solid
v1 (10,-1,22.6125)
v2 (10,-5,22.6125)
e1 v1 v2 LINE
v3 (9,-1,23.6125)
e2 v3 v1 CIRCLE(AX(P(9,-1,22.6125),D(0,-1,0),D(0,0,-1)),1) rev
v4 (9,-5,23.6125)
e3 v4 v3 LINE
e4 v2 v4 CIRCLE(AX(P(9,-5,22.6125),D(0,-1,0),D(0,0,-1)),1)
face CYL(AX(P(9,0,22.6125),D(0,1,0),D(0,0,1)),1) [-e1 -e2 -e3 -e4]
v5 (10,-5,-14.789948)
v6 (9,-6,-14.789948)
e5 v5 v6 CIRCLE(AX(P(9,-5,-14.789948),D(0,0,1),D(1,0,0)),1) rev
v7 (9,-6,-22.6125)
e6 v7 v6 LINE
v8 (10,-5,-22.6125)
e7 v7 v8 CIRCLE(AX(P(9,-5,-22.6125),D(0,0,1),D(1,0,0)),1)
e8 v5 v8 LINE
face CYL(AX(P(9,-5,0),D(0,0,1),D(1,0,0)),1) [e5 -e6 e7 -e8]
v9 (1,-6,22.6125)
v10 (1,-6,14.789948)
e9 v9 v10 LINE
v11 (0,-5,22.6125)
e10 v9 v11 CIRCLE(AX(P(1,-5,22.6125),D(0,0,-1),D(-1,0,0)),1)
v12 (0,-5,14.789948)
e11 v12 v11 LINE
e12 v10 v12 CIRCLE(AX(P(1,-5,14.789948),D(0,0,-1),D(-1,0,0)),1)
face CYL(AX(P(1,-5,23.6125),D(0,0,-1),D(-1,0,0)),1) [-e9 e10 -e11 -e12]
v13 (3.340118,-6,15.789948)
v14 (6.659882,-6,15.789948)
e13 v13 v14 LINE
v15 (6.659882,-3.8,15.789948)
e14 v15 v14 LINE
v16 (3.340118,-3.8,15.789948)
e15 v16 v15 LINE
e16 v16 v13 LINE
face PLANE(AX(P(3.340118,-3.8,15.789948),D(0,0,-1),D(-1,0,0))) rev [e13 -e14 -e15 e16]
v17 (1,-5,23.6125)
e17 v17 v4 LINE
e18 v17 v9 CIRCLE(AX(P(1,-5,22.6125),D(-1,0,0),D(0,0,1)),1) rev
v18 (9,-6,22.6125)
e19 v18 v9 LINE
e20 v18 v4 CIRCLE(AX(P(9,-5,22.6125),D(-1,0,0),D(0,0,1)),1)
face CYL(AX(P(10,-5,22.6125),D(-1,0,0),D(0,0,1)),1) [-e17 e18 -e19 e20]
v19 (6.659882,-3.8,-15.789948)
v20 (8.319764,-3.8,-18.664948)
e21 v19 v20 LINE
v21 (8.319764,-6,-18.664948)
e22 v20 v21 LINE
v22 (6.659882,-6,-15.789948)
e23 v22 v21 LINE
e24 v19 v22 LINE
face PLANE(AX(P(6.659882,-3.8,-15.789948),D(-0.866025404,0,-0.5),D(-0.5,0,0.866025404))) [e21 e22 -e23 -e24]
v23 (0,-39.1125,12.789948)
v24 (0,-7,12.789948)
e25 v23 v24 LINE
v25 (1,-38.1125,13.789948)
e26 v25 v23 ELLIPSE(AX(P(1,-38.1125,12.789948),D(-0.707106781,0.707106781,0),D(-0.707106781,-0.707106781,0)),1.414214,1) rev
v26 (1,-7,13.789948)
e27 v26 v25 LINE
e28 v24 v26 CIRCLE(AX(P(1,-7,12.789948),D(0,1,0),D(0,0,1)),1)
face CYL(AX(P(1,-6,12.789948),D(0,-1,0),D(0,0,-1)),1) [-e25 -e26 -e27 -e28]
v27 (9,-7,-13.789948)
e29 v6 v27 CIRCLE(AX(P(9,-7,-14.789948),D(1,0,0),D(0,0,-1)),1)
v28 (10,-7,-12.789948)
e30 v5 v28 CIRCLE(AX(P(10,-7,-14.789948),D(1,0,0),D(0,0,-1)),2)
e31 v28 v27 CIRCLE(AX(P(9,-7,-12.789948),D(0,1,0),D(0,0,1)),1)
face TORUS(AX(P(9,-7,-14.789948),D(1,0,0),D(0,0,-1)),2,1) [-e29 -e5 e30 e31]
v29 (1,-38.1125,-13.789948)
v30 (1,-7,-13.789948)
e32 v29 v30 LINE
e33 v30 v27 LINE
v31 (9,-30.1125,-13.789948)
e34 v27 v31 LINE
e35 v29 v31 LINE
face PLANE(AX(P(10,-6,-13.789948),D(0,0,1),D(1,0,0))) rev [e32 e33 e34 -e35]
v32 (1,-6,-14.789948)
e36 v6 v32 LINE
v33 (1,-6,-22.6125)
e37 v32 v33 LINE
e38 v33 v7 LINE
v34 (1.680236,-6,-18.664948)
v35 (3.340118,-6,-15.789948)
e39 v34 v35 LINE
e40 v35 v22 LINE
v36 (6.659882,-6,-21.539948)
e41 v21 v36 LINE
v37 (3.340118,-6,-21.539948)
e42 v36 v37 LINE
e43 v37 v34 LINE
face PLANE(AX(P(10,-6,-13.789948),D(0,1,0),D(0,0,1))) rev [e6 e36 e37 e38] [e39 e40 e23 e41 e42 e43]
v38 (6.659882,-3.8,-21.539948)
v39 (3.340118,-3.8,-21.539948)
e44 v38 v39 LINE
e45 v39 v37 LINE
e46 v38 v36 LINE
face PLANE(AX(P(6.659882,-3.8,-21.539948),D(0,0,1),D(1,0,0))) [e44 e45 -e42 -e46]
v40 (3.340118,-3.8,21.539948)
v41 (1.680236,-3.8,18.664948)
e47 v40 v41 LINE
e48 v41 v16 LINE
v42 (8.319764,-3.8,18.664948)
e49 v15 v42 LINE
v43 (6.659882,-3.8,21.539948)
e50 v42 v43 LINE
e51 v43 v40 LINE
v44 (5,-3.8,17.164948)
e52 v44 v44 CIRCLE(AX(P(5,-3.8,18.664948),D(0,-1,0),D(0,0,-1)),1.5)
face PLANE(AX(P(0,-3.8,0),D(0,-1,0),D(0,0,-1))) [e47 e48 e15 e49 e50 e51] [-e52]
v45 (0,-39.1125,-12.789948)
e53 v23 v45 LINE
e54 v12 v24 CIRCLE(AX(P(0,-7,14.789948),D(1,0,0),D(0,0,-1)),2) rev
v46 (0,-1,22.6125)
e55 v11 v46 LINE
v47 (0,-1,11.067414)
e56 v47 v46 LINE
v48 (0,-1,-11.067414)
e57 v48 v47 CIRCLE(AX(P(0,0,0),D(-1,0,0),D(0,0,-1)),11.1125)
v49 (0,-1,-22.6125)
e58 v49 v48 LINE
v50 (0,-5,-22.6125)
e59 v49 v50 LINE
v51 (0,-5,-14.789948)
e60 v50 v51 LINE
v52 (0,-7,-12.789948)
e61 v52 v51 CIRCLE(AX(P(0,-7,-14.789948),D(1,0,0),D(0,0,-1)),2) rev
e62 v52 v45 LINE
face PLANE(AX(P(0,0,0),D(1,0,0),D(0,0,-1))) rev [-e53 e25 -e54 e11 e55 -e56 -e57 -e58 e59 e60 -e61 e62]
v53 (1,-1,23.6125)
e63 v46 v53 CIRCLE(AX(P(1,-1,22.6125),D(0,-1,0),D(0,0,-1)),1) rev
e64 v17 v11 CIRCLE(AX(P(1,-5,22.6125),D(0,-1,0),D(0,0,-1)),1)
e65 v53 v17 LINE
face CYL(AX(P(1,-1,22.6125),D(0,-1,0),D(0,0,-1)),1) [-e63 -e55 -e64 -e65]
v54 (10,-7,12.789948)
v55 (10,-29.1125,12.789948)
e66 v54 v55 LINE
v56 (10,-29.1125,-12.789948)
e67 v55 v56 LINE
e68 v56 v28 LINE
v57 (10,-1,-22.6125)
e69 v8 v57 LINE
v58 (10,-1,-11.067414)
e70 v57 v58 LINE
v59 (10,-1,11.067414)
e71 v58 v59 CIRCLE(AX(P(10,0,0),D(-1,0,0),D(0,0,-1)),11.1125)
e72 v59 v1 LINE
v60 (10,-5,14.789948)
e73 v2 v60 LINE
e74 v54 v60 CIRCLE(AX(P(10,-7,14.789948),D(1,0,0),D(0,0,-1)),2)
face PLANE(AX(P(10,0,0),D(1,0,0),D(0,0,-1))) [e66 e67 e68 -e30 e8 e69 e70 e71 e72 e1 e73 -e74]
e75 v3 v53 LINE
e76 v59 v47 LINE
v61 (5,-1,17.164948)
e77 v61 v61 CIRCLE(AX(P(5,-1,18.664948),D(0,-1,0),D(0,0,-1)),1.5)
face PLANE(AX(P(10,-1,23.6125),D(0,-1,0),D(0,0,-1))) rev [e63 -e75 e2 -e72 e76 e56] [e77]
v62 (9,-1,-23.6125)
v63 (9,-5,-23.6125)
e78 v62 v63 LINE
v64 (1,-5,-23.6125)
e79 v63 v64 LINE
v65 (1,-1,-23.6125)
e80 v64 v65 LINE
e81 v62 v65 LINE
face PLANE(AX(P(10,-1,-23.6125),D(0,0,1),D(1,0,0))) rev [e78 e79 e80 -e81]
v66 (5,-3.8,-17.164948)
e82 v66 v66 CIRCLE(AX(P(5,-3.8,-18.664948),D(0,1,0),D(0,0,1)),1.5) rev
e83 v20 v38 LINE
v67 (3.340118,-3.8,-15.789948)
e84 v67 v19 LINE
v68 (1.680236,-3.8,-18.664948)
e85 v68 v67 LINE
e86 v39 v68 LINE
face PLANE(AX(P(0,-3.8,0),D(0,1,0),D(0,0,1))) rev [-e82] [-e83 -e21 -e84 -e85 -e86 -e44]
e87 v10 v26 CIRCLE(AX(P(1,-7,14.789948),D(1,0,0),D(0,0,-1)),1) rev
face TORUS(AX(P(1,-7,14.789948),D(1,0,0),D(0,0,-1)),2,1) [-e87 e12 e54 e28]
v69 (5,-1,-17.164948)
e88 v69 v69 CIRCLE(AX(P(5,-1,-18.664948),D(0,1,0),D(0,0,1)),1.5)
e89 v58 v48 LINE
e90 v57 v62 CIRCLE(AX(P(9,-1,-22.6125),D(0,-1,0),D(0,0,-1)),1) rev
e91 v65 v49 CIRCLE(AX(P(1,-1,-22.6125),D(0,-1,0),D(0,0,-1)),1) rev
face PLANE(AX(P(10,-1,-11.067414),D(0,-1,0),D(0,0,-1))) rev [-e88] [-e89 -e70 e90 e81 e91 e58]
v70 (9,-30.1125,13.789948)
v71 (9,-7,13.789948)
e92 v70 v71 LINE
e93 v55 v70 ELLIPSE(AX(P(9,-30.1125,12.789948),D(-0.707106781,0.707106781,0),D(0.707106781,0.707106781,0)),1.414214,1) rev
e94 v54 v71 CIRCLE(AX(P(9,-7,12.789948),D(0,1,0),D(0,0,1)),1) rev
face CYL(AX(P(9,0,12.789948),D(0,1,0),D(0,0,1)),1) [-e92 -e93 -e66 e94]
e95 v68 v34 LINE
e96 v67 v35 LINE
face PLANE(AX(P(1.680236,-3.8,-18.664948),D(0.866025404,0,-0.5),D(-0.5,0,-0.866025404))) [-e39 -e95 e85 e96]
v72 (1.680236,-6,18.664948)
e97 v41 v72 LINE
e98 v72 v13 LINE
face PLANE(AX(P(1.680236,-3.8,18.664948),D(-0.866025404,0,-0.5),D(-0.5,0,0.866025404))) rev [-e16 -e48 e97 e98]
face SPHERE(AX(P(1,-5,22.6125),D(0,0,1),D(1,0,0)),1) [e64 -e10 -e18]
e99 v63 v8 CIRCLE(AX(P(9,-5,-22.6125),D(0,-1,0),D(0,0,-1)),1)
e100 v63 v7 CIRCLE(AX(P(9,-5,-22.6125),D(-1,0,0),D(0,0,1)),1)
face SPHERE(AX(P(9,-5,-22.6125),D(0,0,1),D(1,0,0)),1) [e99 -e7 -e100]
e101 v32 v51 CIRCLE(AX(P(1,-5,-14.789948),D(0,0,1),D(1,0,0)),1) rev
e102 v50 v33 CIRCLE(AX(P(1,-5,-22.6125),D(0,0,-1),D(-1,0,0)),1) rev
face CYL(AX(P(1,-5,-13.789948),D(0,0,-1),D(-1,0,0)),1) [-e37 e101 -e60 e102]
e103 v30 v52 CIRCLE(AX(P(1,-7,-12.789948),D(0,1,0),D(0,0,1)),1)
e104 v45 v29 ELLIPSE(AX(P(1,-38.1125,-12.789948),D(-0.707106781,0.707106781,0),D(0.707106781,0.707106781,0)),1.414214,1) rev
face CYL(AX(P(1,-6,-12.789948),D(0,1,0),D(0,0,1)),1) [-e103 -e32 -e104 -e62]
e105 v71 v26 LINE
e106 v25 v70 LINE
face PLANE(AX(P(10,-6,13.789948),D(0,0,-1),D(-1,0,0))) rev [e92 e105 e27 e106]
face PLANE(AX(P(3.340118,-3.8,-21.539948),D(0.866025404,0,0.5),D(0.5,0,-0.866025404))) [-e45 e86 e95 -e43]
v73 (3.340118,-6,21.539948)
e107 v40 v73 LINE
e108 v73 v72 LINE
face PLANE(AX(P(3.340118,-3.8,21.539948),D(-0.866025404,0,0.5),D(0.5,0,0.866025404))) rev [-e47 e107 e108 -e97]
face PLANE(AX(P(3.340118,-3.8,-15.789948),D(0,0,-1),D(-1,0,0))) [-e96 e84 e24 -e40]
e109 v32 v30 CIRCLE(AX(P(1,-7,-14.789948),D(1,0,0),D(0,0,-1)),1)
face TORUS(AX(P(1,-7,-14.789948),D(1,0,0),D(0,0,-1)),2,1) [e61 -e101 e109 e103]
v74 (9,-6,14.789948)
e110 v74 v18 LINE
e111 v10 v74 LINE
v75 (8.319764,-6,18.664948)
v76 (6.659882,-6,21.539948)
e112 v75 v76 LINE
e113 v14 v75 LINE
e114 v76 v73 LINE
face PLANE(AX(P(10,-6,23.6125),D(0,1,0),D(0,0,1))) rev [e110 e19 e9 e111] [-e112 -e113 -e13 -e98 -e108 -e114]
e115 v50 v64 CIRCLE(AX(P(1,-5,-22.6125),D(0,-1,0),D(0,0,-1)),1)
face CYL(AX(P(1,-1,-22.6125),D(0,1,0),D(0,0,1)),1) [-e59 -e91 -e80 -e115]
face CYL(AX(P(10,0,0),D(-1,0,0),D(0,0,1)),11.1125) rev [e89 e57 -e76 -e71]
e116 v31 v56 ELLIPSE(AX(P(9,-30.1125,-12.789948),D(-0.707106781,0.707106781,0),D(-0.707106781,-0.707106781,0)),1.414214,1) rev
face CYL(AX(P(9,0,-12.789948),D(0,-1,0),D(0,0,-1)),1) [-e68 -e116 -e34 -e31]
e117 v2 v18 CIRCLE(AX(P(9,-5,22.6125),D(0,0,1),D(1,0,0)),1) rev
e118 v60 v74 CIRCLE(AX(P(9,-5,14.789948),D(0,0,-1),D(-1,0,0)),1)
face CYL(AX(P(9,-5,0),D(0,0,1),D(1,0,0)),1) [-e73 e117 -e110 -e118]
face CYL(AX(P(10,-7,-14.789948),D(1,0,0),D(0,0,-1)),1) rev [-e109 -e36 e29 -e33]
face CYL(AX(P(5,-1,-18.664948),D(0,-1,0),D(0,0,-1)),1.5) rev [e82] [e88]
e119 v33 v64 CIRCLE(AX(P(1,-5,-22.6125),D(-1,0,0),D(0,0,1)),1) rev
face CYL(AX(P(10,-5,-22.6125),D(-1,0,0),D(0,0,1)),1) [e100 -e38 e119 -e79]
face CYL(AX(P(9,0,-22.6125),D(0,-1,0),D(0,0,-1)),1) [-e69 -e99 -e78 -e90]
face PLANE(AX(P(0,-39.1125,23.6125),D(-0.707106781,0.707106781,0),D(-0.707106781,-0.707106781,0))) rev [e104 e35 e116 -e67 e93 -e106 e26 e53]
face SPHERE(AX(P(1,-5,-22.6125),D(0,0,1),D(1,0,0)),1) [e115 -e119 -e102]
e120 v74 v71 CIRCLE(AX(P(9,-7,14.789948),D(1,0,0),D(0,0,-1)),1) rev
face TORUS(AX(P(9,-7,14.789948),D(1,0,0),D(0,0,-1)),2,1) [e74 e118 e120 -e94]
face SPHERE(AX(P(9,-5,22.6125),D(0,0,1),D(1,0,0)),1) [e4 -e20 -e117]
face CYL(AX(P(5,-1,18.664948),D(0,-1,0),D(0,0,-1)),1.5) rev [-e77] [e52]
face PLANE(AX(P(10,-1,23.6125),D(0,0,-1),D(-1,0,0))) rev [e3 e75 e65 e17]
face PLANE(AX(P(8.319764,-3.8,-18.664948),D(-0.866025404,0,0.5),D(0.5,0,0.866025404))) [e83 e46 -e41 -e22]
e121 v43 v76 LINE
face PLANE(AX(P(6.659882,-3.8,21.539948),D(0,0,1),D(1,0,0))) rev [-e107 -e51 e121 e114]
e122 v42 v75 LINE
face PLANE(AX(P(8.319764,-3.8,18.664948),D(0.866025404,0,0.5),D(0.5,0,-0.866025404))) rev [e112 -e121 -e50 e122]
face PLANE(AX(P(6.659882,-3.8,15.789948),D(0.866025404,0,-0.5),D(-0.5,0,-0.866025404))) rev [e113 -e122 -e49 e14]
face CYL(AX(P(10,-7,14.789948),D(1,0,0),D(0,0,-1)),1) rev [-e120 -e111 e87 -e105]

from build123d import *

# Parameters (mm, degrees)
CLAMP_EXTRUDE_DEPTH = 10
CUT_EXTRUDE3_DEPTH  = 56.03390543
FILLET2_R           = 1
FILLET3_R           = 1
CUT_EXTRUDE4_DEPTH  = 2.2
HOLE_5_R            = 1.5
CUT_EXTRUDE5_DEPTH  = 42.880637682


with BuildPart() as part:
    # Sketch4 → Clamp Extrude (new body)
    with BuildSketch(Plane(origin=(0, 0, 0), x_dir=(0, 0, -1), z_dir=(1, 0, 0))):
        with BuildLine():
            Line((-23.612500003, -1), (-23.612500003, -6))
            Line((-23.612500003, -6), (-13.789947652, -6))
            Line((-13.789947652, -6), (-13.789947652, -39.1125))
            Line((-13.789947652, -39.1125), (13.789947652, -39.1125))
            Line((13.789947652, -39.1125), (13.789947652, -6))
            Line((13.789947652, -6), (23.612500003, -6))
            Line((23.612500003, -6), (23.612500003, -1))
            Line((23.612500003, -1), (11.067414163, -1))
            ThreePointArc((11.067414163, -1), (0, -11.1125), (-11.067414163, -1))
            Line((-11.067414163, -1), (-23.612500003, -1))
        make_face()
    extrude(amount=CLAMP_EXTRUDE_DEPTH)

    # Sketch10 → Cut-Extrude3 (cut, through all)
    with BuildSketch(Plane(origin=(0, 0, -13.789947652), x_dir=(-1, 0, 0), z_dir=(0, 0, -1))):
        Polygon((0, -39.1125), (-10, -29.1125), (-10, -39.1125), align=None)
    extrude(amount=-CUT_EXTRUDE3_DEPTH, mode=Mode.SUBTRACT)

    # Fillet2
    fillet2_edges = [part.edges().sort_by_distance(p)[0] for p in [
        (0, -6, 18.701223827),
        (0, -6, -18.701223827),
        (0, -22.55625, -13.789947652),
        (0, -22.55625, 13.789947652),
        (10, -6, -18.701223827),
        (5, -6, 13.789947652),
        (5, -6, 23.612500003),
        (5, -6, -23.612500003),
        (5, -6, -13.789947652),
        (10, -17.55625, -13.789947652),
        (10, -6, 18.701223827),
        (10, -17.55625, 13.789947652),
    ]]
    fillet(fillet2_edges, radius=FILLET2_R)

    # Fillet3
    # the kernel refuses this fillet: 1 mm, written as the material it takes off along each edge
    with BuildSketch(Plane(origin=(1, -5, 22.612500003), x_dir=(-1, 0, 0), z_dir=(0, 0, 1))) as fillet3_piece_1_section:
        Polygon((0, 0), (FILLET3_R, 0), (FILLET3_R, FILLET3_R), (0, FILLET3_R), align=None)
    fillet3_piece_1 = extrude(amount=FILLET3_R, mode=Mode.PRIVATE)
    fillet3_piece_1 = fillet3_piece_1 - Plane(origin=(1, -5, 22.612500003), x_dir=(0.7071067811865475, 0.7071067811865475, 0), z_dir=(0, 0, 1)) * Sphere(FILLET3_R, mode=Mode.PRIVATE)
    add(fillet3_piece_1, mode=Mode.SUBTRACT)
    with BuildSketch(Plane(origin=(9, -5, 22.612500003), x_dir=(1, 0, 0), z_dir=(0, 0, 1))) as fillet3_piece_2_section:
        Polygon((0, 0), (FILLET3_R, 0), (FILLET3_R, -FILLET3_R), (0, -FILLET3_R), align=None)
    fillet3_piece_2 = extrude(amount=FILLET3_R, mode=Mode.PRIVATE)
    fillet3_piece_2 = fillet3_piece_2 - Plane(origin=(9, -5, 22.612500003), x_dir=(-0.7071067811865475, 0.7071067811865475, 0), z_dir=(0, 0, 1)) * Sphere(FILLET3_R, mode=Mode.PRIVATE)
    add(fillet3_piece_2, mode=Mode.SUBTRACT)
    with BuildSketch(Plane(origin=(9, -5, -22.612500003), x_dir=(0, 0, -1), z_dir=(1, 0, 0))) as fillet3_piece_3_section:
        Polygon((0, 0), (FILLET3_R, 0), (FILLET3_R, -FILLET3_R), (0, -FILLET3_R), align=None)
    fillet3_piece_3 = extrude(amount=FILLET3_R, mode=Mode.PRIVATE)
    fillet3_piece_3 = fillet3_piece_3 - Plane(origin=(9, -5, -22.612500003), x_dir=(0, 0.7071067811865475, 0.7071067811865475), z_dir=(1, 0, 0)) * Sphere(FILLET3_R, mode=Mode.PRIVATE)
    add(fillet3_piece_3, mode=Mode.SUBTRACT)
    with BuildSketch(Plane(origin=(1, -5, -22.612500003), x_dir=(0, 0, -1), z_dir=(-1, 0, 0))) as fillet3_piece_4_section:
        Polygon((0, 0), (FILLET3_R, 0), (FILLET3_R, FILLET3_R), (0, FILLET3_R), align=None)
    fillet3_piece_4 = extrude(amount=FILLET3_R, mode=Mode.PRIVATE)
    fillet3_piece_4 = fillet3_piece_4 - Plane(origin=(1, -5, -22.612500003), x_dir=(0, 0.7071067811865475, 0.7071067811865475), z_dir=(-1, 0, 0)) * Sphere(FILLET3_R, mode=Mode.PRIVATE)
    add(fillet3_piece_4, mode=Mode.SUBTRACT)
    with BuildSketch(Plane(origin=(0, 1.5, 23.612500003), x_dir=(1, 0, 0), z_dir=(0, -1, 0)), Plane(origin=(10, -5, -23.612500003), x_dir=(0, 0, 1), z_dir=(0, 1, 0))) as fillet3_piece_5:
        with BuildLine():
            CenterArc((FILLET3_R, -FILLET3_R), FILLET3_R, 90, 90)
            Line((0, -FILLET3_R), (0, 0))
            Line((0, 0), (FILLET3_R, 0))
        make_face()
    extrude(amount=6.5, mode=Mode.SUBTRACT)
    with BuildSketch(Plane(origin=(10, 1.5, 23.612500003), x_dir=(-1, 0, 0), z_dir=(0, -1, 0)), Plane(origin=(0, -5, -23.612500003), x_dir=(0, 0, 1), z_dir=(0, 1, 0))) as fillet3_piece_6:
        with BuildLine():
            CenterArc((FILLET3_R, FILLET3_R), FILLET3_R, 180, 90)
            Line((0, FILLET3_R), (0, 0))
            Line((0, 0), (FILLET3_R, 0))
        make_face()
    extrude(amount=6.5, mode=Mode.SUBTRACT)

    # Hole → Cut-Extrude4 (cut)
    with BuildSketch(Plane.XZ.offset(6)):
        Polygon((8.319764048, 18.664947652), (6.659882024, 21.539947652), (3.340117976, 21.539947652), (1.680235952, 18.664947652), (3.340117976, 15.789947652), (6.659882024, 15.789947652), align=None)
        Polygon((6.659882024, -15.789947652), (8.319764048, -18.664947652), (6.659882024, -21.539947652), (3.340117976, -21.539947652), (1.680235952, -18.664947652), (3.340117976, -15.789947652), align=None)
    extrude(amount=-CUT_EXTRUDE4_DEPTH, mode=Mode.SUBTRACT)

    # Hole<5> → Cut-Extrude5 (cut, through all)
    with BuildSketch(Plane.XZ.offset(6)):
        with Locations(Location((5, 18.664947652, 0), (0, 0, 270))):
            Circle(HOLE_5_R)
        with Locations(Location((5, -18.664947652, 0), (0, 0, 90))):
            Circle(HOLE_5_R)
    extrude(amount=-CUT_EXTRUDE5_DEPTH, mode=Mode.SUBTRACT)


solid = part.part
